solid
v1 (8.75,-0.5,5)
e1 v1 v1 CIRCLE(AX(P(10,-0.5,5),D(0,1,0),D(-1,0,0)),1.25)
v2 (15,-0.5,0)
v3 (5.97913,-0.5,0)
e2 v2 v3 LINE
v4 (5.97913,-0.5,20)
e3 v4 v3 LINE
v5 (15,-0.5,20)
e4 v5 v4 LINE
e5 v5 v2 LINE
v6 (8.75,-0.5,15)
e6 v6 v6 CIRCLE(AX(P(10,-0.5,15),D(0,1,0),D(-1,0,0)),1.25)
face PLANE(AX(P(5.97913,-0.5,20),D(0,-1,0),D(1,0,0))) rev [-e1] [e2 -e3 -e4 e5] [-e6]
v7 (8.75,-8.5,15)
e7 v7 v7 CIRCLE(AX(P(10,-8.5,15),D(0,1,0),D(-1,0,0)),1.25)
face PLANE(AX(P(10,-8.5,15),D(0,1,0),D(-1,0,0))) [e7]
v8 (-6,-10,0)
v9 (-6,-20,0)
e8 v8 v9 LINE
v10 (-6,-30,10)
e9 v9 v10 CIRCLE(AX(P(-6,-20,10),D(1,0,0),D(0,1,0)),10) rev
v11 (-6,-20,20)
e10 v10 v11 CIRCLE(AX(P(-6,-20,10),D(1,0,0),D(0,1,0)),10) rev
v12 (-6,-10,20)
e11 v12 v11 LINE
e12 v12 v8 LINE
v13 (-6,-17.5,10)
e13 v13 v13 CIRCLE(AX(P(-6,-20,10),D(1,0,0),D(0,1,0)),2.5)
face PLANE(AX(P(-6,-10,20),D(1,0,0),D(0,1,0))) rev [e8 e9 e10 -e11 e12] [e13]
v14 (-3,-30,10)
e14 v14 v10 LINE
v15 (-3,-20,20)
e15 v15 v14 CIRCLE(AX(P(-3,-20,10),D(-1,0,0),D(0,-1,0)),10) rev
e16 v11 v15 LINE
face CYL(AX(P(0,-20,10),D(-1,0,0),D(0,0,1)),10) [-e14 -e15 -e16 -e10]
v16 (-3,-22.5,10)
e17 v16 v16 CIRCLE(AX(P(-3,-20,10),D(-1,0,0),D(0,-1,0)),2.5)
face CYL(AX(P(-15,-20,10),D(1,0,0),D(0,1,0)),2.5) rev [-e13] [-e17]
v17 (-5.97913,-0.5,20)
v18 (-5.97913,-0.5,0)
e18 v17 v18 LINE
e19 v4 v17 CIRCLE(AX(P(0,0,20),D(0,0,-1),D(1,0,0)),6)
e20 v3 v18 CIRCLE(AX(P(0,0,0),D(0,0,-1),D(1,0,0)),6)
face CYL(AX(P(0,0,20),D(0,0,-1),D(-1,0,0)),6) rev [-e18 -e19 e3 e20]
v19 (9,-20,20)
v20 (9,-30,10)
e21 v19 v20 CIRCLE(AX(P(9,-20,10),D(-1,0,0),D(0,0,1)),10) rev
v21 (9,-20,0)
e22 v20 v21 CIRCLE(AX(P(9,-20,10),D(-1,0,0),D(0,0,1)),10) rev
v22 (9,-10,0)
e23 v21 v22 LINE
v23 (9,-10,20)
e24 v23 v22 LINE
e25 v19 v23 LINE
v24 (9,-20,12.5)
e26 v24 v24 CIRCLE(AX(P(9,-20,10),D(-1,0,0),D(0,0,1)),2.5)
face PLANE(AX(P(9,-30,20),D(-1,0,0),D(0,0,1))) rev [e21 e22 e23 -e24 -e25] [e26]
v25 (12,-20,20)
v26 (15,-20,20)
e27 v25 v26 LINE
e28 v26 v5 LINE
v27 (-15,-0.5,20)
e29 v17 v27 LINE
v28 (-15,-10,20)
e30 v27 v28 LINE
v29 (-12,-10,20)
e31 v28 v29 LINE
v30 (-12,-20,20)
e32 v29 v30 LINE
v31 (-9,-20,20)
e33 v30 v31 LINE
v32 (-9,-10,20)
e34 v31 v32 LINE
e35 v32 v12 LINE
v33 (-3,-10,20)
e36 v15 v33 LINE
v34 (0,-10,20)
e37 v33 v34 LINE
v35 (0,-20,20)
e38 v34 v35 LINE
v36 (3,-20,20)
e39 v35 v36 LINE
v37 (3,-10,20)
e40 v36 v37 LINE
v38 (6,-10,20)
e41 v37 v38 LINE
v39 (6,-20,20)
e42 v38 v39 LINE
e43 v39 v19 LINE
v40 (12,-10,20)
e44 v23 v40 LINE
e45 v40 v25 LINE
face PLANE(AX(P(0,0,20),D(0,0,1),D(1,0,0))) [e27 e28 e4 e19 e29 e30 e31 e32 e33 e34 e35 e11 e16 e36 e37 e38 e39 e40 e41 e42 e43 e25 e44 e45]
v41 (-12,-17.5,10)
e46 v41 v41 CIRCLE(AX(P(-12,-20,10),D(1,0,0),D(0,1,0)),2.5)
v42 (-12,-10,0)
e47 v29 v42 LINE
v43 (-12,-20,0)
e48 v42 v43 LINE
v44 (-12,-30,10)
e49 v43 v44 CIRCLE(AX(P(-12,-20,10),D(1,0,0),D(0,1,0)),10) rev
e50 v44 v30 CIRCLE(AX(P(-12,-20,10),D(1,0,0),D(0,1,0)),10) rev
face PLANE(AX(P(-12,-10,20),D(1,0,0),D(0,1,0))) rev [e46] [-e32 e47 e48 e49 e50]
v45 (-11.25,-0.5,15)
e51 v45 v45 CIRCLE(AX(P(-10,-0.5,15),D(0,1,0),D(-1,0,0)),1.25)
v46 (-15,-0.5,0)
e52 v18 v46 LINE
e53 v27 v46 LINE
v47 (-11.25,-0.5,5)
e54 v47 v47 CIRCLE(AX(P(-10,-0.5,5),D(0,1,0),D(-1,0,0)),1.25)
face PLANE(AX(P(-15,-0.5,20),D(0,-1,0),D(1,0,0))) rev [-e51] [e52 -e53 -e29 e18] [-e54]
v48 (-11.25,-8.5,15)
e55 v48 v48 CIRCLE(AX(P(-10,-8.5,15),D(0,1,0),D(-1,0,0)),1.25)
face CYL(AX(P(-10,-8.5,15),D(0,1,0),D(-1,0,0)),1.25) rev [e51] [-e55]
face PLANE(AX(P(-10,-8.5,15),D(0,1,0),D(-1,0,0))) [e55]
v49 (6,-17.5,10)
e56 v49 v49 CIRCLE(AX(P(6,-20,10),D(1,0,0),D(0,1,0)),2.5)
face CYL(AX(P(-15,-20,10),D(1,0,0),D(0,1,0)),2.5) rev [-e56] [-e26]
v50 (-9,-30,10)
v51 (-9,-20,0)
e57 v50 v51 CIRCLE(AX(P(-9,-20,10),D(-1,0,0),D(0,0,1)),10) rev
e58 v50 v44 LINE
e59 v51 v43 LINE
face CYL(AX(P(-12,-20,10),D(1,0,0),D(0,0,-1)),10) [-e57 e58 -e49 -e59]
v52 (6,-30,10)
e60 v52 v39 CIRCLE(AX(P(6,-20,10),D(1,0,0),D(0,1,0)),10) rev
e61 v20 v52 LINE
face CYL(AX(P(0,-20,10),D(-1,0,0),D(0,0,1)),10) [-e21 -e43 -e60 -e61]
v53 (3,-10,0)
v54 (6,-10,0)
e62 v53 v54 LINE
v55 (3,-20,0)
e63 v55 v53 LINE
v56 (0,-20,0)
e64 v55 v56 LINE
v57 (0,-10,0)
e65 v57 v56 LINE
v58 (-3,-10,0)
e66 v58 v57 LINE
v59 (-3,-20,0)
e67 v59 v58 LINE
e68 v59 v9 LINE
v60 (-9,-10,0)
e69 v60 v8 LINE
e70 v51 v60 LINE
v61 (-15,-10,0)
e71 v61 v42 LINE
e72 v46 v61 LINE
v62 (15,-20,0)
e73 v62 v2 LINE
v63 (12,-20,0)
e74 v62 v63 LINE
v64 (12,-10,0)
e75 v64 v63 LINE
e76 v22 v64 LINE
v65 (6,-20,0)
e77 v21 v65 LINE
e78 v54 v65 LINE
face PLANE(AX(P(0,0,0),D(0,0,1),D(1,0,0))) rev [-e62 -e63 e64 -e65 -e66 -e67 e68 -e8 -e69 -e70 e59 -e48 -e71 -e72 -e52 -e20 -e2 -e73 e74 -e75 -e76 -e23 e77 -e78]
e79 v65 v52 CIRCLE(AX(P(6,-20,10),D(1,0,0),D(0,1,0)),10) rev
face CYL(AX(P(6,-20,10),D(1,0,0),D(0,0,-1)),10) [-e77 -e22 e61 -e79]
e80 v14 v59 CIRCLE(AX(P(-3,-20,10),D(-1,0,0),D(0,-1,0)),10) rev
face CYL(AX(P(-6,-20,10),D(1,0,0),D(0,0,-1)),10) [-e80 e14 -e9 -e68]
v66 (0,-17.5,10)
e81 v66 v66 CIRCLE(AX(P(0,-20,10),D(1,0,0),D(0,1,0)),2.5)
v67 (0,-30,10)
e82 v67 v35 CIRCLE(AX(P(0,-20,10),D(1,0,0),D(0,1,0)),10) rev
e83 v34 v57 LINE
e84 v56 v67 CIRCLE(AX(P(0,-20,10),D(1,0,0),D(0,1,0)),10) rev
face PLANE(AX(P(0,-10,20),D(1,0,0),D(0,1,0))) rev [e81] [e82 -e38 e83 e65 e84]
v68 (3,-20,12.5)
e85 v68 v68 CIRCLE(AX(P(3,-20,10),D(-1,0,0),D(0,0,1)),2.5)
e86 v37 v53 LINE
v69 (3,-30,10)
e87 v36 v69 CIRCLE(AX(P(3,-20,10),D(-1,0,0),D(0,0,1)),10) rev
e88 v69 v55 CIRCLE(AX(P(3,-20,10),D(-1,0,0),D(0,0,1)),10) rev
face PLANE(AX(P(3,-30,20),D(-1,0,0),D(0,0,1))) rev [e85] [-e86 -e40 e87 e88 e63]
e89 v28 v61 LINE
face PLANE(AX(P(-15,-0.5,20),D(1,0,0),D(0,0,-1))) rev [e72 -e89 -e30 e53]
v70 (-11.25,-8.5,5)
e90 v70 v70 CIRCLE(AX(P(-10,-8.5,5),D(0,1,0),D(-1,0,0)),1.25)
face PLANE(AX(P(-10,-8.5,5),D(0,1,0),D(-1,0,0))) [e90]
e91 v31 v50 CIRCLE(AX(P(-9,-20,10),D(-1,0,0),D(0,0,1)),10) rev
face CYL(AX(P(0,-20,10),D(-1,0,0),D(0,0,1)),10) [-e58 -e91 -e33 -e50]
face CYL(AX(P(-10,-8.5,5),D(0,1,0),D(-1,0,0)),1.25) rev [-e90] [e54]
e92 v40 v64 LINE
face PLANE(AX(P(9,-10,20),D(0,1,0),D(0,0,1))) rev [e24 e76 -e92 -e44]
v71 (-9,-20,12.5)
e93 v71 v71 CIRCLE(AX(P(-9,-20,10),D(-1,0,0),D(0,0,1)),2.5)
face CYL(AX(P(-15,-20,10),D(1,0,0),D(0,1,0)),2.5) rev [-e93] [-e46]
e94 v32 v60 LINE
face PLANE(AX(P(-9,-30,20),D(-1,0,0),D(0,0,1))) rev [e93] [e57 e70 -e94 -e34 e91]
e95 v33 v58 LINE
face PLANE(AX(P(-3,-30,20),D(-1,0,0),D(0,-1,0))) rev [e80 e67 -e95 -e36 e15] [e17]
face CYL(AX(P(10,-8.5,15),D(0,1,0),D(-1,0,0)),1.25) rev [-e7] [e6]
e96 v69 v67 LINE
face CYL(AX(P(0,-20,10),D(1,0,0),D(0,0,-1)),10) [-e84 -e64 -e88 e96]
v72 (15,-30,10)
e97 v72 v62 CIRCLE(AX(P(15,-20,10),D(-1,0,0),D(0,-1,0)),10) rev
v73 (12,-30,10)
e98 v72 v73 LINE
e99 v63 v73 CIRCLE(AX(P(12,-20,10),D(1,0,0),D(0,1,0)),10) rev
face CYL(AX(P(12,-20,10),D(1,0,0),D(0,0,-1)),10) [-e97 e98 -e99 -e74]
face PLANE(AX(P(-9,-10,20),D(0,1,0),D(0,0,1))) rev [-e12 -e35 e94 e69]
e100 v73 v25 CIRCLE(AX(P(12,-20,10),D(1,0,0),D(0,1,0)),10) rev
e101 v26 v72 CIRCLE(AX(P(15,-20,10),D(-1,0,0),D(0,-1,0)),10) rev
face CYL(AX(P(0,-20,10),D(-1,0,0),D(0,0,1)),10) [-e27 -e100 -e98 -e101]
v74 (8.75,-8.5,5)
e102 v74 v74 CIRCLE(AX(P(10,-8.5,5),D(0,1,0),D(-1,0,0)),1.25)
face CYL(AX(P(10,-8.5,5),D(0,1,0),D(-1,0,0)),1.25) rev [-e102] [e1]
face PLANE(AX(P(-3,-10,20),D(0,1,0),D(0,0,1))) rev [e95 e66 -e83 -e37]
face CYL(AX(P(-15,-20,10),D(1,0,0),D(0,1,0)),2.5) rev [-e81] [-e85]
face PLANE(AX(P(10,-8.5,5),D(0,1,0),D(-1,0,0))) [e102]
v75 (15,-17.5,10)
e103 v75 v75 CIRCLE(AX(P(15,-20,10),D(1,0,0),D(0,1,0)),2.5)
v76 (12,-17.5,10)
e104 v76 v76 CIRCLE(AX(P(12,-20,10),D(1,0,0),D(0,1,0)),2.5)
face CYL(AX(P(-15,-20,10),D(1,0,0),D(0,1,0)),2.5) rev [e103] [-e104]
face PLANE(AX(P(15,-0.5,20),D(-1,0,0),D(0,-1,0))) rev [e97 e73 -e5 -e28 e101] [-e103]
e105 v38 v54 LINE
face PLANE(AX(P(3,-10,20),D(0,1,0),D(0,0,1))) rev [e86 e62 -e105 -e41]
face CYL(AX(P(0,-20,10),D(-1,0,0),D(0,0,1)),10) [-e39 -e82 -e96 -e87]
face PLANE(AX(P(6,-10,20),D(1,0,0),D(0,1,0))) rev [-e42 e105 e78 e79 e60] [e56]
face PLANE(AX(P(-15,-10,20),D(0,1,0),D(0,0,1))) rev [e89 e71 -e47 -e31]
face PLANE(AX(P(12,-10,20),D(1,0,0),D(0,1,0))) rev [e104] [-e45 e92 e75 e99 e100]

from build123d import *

# Parameters (mm, degrees)
BOSS_EXTRU_1_DEPTH      = 20
ESQUISSE2_R             = 1.25
ENL_V_MAT_EXTRU_1_DEPTH = 8
CONG_1_R                = 10
ESQUISSE3_R             = 2.5
ENL_V_MAT_EXTRU_2_DEPTH = 30


with BuildPart() as part:
    # Esquisse1 → Boss.-Extru.1 (new body)
    with BuildSketch(Plane.XY):
        with BuildLine():
            Line((-15, -0.5), (-15, -10))
            Line((-15, -10), (-12, -10))
            Line((-12, -10), (-12, -30))
            Line((-12, -30), (-9, -30))
            Line((-9, -30), (-9, -10))
            Line((-9, -10), (-6, -10))
            Line((-6, -10), (-6, -30))
            Line((-6, -30), (-3, -30))
            Line((-3, -30), (-3, -10))
            Line((-3, -10), (0, -10))
            Line((0, -10), (0, -30))
            Line((0, -30), (3, -30))
            Line((3, -30), (3, -10))
            Line((3, -10), (6, -10))
            Line((6, -10), (6, -30))
            Line((6, -30), (9, -30))
            Line((9, -30), (9, -10))
            Line((9, -10), (12, -10))
            Line((12, -10), (12, -30))
            Line((12, -30), (15, -30))
            Line((15, -30), (15, -0.5))
            Line((15, -0.5), (5.979130372, -0.5))
            ThreePointArc((5.979130372, -0.5), (0, -6), (-5.979130372, -0.5))
            Line((-5.979130372, -0.5), (-15, -0.5))
        make_face()
    extrude(amount=BOSS_EXTRU_1_DEPTH)

    # Esquisse2 → Enlèv. mat.-Extru.1 (cut)
    with BuildSketch(Plane(origin=(0, -0.5, 0), x_dir=(1, 0, 0), z_dir=(0, 1, 0))):
        with Locations(Location((-10, -5, 0), (0, 0, 180))):
            Circle(ESQUISSE2_R)
        with Locations(Location((-10, -15, 0), (0, 0, 180))):
            Circle(ESQUISSE2_R)
        with Locations(Location((10, -5, 0), (0, 0, 180))):
            Circle(ESQUISSE2_R)
        with Locations(Location((10, -15, 0), (0, 0, 180))):
            Circle(ESQUISSE2_R)
    extrude(amount=-ENL_V_MAT_EXTRU_1_DEPTH, mode=Mode.SUBTRACT)

    # Congé1
    cong_1_edges = [part.edges().sort_by_distance(p)[0] for p in [
        (-10.5, -30, 0),
        (-4.5, -30, 0),
        (1.5, -30, 0),
        (7.5, -30, 0),
        (13.5, -30, 0),
        (13.5, -30, 20),
        (7.5, -30, 20),
        (1.5, -30, 20),
        (-4.5, -30, 20),
        (-10.5, -30, 20),
    ]]
    fillet(cong_1_edges, radius=CONG_1_R - 0.0001)  # a hair under: the kernel refuses the full size

    # Esquisse3 → Enlèv. mat.-Extru.2 (cut)
    with BuildSketch(Plane(origin=(15, 0, 0), x_dir=(0, 0, -1), z_dir=(1, 0, 0))):
        with Locations(Location((-10, -20, 0), (0, 0, 90))):
            Circle(ESQUISSE3_R)
    extrude(amount=-ENL_V_MAT_EXTRU_2_DEPTH, mode=Mode.SUBTRACT)


solid = part.part
